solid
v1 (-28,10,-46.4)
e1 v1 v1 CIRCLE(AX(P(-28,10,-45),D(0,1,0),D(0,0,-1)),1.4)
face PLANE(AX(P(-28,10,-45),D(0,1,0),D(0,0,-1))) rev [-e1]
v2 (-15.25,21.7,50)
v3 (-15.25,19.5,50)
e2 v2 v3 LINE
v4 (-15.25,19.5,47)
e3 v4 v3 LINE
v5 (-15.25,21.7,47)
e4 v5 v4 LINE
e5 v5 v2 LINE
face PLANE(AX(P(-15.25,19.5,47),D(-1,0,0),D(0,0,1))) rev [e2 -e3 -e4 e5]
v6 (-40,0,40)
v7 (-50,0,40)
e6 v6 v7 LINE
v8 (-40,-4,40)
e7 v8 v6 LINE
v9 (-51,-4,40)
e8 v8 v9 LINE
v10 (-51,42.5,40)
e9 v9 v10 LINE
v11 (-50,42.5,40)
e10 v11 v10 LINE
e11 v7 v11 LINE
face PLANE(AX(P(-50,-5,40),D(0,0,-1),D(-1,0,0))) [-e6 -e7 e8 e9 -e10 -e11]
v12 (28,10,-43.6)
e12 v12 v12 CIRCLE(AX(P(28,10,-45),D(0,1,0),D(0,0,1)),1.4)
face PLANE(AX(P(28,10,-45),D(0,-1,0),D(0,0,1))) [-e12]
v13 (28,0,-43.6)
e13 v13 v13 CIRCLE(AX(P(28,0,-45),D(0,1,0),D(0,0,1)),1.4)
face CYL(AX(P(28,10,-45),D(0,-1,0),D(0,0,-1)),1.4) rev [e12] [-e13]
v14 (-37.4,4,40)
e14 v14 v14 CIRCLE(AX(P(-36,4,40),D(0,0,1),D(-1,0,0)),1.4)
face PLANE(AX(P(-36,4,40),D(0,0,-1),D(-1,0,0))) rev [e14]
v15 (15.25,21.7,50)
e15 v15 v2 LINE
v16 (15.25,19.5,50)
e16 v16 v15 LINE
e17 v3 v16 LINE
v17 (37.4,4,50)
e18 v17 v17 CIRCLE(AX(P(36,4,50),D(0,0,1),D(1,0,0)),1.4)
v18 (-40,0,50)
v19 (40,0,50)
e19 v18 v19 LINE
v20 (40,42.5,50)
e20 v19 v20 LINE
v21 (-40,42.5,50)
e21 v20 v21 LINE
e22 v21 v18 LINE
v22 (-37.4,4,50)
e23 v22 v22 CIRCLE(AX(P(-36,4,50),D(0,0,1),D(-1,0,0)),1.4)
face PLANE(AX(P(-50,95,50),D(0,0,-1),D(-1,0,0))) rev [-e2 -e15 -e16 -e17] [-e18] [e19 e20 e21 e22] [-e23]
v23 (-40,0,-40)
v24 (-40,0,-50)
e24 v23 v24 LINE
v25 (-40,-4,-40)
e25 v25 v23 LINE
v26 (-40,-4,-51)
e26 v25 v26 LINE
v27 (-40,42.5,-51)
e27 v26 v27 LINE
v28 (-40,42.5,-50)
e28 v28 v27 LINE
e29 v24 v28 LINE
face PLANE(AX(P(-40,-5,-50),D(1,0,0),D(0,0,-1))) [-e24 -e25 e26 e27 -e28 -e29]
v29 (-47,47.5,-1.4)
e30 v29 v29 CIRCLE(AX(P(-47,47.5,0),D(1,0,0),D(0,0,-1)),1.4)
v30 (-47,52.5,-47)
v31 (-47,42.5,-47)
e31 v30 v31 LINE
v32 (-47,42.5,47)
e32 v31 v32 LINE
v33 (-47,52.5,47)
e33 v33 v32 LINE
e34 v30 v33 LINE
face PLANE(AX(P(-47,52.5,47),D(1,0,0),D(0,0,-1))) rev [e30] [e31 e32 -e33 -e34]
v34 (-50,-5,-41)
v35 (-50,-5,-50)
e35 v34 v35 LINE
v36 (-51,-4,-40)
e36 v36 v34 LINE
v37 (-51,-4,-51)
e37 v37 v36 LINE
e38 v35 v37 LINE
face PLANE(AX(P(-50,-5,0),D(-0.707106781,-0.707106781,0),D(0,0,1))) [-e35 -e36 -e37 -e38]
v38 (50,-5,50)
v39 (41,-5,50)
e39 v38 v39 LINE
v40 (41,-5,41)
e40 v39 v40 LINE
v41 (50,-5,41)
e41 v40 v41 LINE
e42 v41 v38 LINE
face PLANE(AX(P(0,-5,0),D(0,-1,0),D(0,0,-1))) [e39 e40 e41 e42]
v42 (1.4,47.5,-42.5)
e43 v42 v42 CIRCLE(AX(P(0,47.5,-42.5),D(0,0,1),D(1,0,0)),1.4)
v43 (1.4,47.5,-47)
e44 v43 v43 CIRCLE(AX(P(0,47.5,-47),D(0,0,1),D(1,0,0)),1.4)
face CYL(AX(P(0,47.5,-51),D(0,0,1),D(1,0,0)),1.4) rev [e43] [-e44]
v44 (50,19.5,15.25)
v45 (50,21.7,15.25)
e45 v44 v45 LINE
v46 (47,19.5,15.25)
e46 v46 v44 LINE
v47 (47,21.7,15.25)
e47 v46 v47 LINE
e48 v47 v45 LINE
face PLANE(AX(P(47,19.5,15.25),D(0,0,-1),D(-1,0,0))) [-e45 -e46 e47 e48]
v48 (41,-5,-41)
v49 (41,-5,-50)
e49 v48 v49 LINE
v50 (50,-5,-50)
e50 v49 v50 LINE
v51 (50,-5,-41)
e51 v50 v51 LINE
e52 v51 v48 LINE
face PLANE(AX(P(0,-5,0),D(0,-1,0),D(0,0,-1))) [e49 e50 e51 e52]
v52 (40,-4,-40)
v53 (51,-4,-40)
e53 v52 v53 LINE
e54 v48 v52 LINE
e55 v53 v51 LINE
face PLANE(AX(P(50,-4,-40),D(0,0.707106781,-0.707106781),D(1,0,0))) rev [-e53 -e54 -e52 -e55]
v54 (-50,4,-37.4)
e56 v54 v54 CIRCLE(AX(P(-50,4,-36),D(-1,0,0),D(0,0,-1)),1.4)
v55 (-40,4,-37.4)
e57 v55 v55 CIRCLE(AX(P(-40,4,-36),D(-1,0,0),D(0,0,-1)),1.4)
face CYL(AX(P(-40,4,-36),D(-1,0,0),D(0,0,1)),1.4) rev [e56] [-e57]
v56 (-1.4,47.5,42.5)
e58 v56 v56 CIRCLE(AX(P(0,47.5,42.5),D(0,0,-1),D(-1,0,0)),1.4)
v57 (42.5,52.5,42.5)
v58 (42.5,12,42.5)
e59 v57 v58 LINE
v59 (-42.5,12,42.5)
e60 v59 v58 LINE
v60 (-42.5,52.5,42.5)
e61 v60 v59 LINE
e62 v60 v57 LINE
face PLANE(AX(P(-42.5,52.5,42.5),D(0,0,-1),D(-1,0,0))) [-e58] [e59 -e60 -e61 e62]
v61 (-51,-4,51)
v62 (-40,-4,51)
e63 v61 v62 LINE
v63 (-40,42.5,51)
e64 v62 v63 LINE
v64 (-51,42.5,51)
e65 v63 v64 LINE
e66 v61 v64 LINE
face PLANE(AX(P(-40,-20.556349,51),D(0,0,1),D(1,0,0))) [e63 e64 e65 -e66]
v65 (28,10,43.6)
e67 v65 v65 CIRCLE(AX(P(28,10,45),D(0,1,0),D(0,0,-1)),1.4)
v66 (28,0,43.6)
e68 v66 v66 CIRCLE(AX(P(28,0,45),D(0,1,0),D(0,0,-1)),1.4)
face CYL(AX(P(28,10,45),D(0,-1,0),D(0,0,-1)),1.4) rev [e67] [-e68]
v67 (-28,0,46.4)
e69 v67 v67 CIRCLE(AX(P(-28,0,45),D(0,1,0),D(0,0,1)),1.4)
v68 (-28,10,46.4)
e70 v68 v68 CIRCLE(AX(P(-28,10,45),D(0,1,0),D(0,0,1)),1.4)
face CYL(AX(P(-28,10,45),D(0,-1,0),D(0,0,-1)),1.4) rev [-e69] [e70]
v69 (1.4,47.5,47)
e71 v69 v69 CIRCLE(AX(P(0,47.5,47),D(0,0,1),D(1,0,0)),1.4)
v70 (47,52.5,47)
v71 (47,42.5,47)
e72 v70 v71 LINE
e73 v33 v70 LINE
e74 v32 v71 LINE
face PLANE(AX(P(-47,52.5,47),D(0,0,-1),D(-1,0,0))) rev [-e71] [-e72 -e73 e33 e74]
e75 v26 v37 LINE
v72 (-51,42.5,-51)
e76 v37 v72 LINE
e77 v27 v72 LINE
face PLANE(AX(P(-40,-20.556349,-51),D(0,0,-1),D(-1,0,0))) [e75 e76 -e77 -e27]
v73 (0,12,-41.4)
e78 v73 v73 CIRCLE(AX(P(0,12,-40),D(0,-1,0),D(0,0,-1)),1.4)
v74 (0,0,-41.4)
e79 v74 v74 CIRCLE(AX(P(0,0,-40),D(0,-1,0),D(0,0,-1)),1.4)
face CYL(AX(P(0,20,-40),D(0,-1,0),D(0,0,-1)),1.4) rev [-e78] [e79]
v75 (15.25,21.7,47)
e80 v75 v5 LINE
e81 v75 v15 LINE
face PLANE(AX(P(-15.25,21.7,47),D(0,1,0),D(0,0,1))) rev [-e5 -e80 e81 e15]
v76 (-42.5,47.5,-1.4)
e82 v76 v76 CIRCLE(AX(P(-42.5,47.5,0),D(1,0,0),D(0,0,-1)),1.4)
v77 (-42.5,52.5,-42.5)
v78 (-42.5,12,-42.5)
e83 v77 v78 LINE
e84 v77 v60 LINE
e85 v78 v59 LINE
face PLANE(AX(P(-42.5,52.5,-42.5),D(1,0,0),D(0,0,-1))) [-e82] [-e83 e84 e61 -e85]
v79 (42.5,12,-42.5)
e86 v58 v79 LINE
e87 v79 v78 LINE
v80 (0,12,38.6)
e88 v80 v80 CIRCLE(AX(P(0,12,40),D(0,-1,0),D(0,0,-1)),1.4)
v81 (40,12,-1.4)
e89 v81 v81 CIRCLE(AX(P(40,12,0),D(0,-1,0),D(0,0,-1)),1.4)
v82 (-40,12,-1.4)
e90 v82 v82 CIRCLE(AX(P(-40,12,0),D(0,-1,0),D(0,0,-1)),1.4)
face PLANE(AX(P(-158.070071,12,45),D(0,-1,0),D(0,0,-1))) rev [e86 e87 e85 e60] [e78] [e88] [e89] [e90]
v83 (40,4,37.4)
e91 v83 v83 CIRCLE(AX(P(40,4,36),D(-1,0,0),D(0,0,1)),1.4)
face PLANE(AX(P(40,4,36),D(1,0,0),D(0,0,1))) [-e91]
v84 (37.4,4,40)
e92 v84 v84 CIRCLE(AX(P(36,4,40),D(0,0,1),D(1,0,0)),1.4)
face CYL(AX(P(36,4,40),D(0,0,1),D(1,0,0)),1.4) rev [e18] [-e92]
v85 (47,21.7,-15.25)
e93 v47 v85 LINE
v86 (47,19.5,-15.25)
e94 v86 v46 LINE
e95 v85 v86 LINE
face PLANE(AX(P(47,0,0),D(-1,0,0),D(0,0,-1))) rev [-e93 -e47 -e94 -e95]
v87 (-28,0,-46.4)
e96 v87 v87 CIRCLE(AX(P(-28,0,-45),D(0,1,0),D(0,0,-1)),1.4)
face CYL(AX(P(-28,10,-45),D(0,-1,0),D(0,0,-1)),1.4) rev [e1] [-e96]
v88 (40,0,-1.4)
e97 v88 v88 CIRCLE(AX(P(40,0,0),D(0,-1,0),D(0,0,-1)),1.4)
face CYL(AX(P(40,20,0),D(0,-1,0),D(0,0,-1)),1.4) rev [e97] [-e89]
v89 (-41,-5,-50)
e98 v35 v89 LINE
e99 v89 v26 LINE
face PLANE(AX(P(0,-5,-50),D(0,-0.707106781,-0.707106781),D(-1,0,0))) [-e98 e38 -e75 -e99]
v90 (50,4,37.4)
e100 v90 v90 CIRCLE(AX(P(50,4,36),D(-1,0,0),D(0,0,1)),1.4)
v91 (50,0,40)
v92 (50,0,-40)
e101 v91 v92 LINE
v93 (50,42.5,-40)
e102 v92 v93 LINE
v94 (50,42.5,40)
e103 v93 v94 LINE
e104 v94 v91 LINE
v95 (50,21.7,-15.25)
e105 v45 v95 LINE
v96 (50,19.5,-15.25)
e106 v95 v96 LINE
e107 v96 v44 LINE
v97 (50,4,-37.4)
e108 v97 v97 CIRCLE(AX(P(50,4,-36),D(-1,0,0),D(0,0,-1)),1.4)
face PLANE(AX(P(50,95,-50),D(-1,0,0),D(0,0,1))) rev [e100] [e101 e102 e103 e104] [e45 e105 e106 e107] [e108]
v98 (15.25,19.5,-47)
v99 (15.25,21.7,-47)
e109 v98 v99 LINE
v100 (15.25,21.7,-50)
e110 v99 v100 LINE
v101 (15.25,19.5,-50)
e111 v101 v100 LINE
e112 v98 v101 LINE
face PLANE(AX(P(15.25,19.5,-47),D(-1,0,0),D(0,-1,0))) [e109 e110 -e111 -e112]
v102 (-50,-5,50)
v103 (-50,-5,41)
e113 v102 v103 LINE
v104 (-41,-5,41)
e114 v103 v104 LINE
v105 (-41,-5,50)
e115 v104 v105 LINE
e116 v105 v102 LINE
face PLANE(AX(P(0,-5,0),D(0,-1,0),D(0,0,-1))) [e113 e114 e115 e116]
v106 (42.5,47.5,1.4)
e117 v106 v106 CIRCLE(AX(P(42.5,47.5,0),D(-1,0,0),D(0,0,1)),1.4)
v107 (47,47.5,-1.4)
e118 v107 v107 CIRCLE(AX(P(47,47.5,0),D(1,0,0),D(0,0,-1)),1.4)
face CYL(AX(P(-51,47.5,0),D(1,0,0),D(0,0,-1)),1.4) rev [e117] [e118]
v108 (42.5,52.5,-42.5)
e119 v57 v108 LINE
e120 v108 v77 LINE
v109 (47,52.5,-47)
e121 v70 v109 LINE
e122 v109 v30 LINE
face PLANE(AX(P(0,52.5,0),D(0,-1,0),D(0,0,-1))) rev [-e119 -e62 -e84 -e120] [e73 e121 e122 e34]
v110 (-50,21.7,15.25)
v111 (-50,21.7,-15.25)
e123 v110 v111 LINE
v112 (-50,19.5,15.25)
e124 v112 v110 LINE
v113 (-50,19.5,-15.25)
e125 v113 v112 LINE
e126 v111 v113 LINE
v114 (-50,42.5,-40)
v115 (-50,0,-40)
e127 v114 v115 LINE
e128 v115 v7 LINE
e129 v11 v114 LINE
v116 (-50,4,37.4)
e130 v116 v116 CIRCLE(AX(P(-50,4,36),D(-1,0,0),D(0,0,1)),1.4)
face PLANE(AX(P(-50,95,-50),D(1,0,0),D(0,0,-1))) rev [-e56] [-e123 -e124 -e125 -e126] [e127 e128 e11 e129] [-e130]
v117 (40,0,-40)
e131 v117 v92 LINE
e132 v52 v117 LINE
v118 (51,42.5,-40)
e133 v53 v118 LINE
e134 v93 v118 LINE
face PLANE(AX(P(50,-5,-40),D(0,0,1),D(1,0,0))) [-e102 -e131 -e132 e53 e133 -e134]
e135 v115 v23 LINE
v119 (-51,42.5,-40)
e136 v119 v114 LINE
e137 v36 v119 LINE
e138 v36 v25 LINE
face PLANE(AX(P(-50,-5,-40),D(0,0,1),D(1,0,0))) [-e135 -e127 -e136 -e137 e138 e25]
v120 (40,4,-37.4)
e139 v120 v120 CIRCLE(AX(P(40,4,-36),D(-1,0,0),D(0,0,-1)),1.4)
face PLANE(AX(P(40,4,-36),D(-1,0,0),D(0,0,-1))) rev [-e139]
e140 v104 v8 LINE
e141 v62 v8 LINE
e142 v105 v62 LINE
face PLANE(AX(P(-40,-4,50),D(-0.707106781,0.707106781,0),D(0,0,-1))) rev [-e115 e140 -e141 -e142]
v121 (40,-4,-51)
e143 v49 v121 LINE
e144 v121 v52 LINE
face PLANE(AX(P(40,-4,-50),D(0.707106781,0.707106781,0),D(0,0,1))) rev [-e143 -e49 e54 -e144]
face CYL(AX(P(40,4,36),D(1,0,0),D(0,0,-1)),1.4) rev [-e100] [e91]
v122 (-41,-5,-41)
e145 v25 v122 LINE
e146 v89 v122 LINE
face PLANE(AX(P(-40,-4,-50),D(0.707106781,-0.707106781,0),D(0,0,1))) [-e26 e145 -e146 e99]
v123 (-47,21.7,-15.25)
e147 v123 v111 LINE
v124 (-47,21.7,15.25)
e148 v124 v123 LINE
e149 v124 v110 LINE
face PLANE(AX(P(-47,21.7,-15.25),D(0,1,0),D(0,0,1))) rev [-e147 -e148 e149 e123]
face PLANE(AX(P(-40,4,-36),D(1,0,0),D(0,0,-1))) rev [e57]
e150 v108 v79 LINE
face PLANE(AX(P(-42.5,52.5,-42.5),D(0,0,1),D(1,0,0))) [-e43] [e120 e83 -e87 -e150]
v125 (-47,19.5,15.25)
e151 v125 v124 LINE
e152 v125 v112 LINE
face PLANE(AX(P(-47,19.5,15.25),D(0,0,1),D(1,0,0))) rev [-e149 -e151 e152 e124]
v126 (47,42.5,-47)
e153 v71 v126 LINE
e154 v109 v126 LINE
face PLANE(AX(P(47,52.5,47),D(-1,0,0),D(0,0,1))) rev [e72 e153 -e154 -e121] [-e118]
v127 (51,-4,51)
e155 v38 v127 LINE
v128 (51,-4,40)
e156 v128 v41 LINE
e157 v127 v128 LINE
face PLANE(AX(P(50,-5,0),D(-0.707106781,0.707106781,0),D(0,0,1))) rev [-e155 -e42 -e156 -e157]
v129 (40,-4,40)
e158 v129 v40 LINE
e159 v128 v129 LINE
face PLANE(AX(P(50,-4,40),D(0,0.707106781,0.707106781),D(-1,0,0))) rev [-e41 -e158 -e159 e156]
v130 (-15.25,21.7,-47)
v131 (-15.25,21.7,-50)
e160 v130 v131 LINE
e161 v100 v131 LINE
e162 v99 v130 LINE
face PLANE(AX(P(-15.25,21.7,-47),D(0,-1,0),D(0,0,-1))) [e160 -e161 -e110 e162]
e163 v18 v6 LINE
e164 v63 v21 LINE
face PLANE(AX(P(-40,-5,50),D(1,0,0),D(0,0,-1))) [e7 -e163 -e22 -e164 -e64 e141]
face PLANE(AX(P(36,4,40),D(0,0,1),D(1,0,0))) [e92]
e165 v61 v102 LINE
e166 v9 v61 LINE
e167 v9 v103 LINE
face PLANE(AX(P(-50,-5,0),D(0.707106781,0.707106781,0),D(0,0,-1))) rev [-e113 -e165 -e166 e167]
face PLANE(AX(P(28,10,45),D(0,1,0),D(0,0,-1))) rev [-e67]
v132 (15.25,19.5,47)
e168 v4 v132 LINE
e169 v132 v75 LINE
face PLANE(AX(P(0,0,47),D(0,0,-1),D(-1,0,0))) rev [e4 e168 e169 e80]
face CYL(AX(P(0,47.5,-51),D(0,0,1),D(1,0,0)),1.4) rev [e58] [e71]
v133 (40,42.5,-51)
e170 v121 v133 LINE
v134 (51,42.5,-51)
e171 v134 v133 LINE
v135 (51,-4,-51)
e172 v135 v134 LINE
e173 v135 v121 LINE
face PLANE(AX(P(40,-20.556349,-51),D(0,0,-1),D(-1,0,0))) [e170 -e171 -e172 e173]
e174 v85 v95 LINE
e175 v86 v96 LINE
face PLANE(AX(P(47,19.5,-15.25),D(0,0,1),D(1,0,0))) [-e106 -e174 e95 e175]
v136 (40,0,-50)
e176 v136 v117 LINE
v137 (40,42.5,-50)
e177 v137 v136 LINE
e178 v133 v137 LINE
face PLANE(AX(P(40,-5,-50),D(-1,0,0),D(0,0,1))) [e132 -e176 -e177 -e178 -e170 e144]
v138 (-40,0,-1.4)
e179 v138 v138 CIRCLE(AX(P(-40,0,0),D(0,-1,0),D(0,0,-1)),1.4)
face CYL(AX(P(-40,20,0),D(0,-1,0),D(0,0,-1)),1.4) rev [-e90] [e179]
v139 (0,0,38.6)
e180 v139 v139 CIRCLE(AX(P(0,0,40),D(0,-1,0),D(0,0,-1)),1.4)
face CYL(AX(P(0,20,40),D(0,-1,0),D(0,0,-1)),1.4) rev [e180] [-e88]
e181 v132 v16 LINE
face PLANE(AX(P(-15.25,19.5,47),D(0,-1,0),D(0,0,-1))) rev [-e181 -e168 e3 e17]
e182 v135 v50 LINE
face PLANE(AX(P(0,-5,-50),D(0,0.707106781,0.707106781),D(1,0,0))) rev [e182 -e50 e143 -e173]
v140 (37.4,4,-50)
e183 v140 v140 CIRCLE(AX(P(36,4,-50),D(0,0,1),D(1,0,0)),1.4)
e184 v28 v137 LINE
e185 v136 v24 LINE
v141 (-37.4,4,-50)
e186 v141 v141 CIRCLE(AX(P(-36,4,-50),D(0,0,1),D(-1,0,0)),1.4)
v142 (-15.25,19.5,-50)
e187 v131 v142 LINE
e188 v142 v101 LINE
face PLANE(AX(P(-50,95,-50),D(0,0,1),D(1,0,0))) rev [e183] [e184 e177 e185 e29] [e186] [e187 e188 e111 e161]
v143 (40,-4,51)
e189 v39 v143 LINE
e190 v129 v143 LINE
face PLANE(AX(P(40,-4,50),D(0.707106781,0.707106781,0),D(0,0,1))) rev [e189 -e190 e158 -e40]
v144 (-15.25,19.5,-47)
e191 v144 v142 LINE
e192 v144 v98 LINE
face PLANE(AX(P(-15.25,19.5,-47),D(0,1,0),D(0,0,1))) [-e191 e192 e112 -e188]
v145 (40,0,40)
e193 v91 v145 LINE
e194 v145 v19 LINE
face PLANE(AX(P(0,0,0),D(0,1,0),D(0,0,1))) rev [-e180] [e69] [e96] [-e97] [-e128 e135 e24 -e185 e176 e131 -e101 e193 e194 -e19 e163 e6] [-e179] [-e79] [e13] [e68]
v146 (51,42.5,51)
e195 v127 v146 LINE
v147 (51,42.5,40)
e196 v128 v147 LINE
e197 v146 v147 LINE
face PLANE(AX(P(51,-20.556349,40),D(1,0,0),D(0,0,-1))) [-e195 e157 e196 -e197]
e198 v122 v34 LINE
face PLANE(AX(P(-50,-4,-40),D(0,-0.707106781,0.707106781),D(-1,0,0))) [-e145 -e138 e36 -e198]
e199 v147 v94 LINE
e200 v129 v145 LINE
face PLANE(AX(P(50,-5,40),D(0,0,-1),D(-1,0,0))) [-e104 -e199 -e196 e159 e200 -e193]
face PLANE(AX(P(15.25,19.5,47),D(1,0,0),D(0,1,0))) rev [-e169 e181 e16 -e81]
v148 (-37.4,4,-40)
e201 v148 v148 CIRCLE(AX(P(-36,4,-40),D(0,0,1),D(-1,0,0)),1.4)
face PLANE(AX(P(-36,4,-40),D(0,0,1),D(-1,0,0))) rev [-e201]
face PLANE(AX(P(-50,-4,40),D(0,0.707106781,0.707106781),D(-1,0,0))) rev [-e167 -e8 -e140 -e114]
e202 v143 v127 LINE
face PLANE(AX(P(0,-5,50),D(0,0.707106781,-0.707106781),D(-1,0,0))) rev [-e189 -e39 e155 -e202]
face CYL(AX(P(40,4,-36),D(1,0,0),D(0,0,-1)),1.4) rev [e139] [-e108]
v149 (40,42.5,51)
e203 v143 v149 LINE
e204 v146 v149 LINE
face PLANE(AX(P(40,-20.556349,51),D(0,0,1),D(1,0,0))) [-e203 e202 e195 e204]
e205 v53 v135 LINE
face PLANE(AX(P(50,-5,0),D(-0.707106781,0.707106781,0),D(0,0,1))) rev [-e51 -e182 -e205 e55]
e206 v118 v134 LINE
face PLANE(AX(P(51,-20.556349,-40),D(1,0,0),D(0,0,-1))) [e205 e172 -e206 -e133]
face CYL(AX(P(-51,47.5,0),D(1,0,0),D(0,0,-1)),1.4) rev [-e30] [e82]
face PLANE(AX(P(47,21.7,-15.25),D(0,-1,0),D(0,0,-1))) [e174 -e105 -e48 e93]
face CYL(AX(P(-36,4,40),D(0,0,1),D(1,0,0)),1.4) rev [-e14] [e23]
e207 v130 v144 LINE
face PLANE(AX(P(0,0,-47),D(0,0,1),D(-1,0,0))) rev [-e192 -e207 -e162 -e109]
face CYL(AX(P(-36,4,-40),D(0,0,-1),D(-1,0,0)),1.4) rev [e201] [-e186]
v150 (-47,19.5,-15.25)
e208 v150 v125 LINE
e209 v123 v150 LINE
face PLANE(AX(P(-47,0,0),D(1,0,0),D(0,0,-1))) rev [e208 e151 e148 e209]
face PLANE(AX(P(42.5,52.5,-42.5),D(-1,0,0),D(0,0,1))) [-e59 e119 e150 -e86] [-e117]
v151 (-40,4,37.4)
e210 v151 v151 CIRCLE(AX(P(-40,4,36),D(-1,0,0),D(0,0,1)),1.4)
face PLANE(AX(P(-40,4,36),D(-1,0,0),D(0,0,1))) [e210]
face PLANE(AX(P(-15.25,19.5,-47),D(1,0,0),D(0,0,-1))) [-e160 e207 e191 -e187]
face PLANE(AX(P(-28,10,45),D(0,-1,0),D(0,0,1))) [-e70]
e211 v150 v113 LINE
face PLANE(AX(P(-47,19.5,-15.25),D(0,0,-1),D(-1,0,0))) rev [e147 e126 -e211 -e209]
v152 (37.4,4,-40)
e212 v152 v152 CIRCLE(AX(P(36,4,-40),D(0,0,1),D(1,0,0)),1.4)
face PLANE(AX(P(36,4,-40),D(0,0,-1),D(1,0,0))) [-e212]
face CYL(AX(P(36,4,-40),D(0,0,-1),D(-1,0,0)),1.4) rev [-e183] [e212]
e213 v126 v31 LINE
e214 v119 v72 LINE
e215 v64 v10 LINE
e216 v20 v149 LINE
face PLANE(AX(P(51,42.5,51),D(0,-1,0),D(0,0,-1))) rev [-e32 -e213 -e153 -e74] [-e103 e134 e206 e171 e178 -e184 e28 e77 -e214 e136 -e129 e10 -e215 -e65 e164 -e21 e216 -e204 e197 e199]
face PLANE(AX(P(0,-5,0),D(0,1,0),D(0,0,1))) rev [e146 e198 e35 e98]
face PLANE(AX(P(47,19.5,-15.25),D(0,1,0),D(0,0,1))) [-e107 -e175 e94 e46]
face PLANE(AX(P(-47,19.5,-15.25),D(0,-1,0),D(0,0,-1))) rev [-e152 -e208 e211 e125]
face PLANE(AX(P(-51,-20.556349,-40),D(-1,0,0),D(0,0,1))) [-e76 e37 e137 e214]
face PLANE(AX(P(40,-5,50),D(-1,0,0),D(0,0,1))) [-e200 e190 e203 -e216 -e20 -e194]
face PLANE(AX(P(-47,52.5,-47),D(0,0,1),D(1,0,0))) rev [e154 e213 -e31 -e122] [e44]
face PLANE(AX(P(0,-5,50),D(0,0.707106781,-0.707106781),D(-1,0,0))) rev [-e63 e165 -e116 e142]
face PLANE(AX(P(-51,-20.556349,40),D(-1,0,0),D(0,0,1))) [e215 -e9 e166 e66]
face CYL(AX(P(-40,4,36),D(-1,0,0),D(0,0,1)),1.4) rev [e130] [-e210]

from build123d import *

# Parameters (mm, degrees)
SKETCH1_W                       = 100
SKETCH1_H                       = 100
BOSS_EXTRUDE1_DEPTH             = 95
SKETCH2_W                       = 10
SKETCH2_H                       = 10
BOSS_EXTRUDE2_DEPTH             = 105
SKETCH3_R                       = 1.4
CUT_EXTRUDE1_DEPTH              = 10
SKETCH4_W                       = 11
SKETCH4_H                       = 11
BOSS_EXTRUDE3_DEPTH             = 105
SKETCH5_R                       = 1.4
CUT_EXTRUDE2_DEPTH              = 10
SKETCH6_R                       = 1.4
CUT_EXTRUDE3_DEPTH              = 10
CHAMFER1_SIZE                   = 1
SKETCH7_W                       = 19
SKETCH7_H                       = 43
SKETCH7_W_2                     = 16
SKETCH7_H_2                     = 40
BOSS_EXTRUDE4_DEPTH             = 3
SKETCH8_W                       = 16
SKETCH8_H                       = 40
CUT_EXTRUDE4_DEPTH              = 10
CHAMFER2_SIZE                   = 13
SKETCH9_W                       = 16
SKETCH9_H                       = 3.1
CUT_EXTRUDE5_DEPTH              = 10
FILLET1_R                       = 1
SKETCH10_R                      = 1.4
CUT_EXTRUDE6_DEPTH              = 10
SKETCH12_W                      = 30.5
SKETCH12_H                      = 2.2
CUT_EXTRUDE7_DEPTH              = 3
SKETCH13_W                      = 30.5
SKETCH13_H                      = 2.2
CUT_EXTRUDE8_DEPTH              = 3
SKETCH14_W                      = 2.2
SKETCH14_H                      = 30.5
CUT_EXTRUDE9_DEPTH              = 3
CUT_EXTRUDE10_DEPTH             = 45
CUT_EXTRUDE10_DEPTH_BACK        = 45
SKETCH15_W                      = 90
SKETCH15_H                      = 58
CUT_EXTRUDE11_REACH             = 125.296
CUT_EXTRUDE11_DIRECTION_2_REACH = 125.296
CHAMFER3_SIZE                   = 4
CUT_EXTRUDE12_DEPTH             = 152.673992497
BOSS_EXTRUDE7_DEPTH             = 10
BOSS_EXTRUDE7_DEPTH_BACK        = 30.5
SKETCH19_W                      = 94
SKETCH19_H                      = 94
SKETCH19_W_2                    = 85
SKETCH19_H_2                    = 85
SKETCH20_R                      = 1.4
CUT_EXTRUDE13_DEPTH             = 123.316188626
SKETCH21_R                      = 1.4
CUT_EXTRUDE14_DEPTH             = 123.316188626
SKETCH22_W                      = 2.2
SKETCH22_H                      = 30.5
BOSS_EXTRUDE8_DEPTH             = 3
SKETCH23_R                      = 1.4
CUT_EXTRUDE15_DEPTH             = 20


with BuildPart() as part:
    # Sketch1 → Boss-Extrude1 (new body)
    with BuildSketch(Plane(origin=(0, 0, 0), x_dir=(1, 0, 0), z_dir=(0, 1, 0))):
        Rectangle(SKETCH1_W, SKETCH1_H)
    extrude(amount=BOSS_EXTRUDE1_DEPTH)

    # Sketch2 → Boss-Extrude2 (add)
    with BuildSketch(Plane(origin=(0, 100, 0), x_dir=(1, 0, 0), z_dir=(0, 1, 0))):
        with Locations((-45, 45)):
            Rectangle(SKETCH2_W, SKETCH2_H)
        with Locations((45, 45)):
            Rectangle(SKETCH2_W, SKETCH2_H)
        with Locations((45, -45)):
            Rectangle(SKETCH2_W, SKETCH2_H)
        with Locations((-45, -45)):
            Rectangle(SKETCH2_W, SKETCH2_H)
    extrude(amount=-BOSS_EXTRUDE2_DEPTH)

    # Sketch3 → Cut-Extrude1 (cut)
    with BuildSketch(Plane(origin=(0, 95, 0), x_dir=(1, 0, 0), z_dir=(0, 1, 0))):
        with Locations(Location((-28, -45, 0), (0, 0, 270))):
            Circle(SKETCH3_R)
        with Locations(Location((28, -45, 0), (0, 0, 90))):
            Circle(SKETCH3_R)
        with Locations(Location((28, 45, 0), (0, 0, 270))):
            Circle(SKETCH3_R)
        with Locations(Location((-28, 45, 0), (0, 0, 90))):
            Circle(SKETCH3_R)
    cut_extrude1 = extrude(amount=-CUT_EXTRUDE1_DEPTH, mode=Mode.SUBTRACT)

    # Sketch4 → Boss-Extrude3 (add)
    with BuildSketch(Plane(origin=(0, 100, 0), x_dir=(1, 0, 0), z_dir=(0, 1, 0))):
        with Locations((-45.5, 45.5)):
            Rectangle(SKETCH4_W, SKETCH4_H)
        with Locations((45.5, 45.5)):
            Rectangle(SKETCH4_W, SKETCH4_H)
        with Locations((45.5, -45.5)):
            Rectangle(SKETCH4_W, SKETCH4_H)
        with Locations((-45.5, -45.5)):
            Rectangle(SKETCH4_W, SKETCH4_H)
    extrude(amount=-BOSS_EXTRUDE3_DEPTH)

    # Sketch5 → Cut-Extrude2 (cut)
    with BuildSketch(Plane.XY.offset(50)):
        with Locations((-36, 91)):
            Circle(SKETCH5_R)
        with Locations(Location((36, 91, 0), (0, 0, 180))):
            Circle(SKETCH5_R)
        with Locations((36, 4)):
            Circle(SKETCH5_R)
        with Locations(Location((-36, 4, 0), (0, 0, 180))):
            Circle(SKETCH5_R)
    cut_extrude2 = extrude(amount=-CUT_EXTRUDE2_DEPTH, mode=Mode.SUBTRACT)

    # Mirror1: Cut-Extrude2 across plane
    add(cut_extrude2.mirror(Plane.XY), mode=Mode.SUBTRACT)

    # Sketch6 → Cut-Extrude3 (cut)
    with BuildSketch(Plane.ZY.offset(50)):
        with Locations((-36, 91)):
            Circle(SKETCH6_R)
        with Locations(Location((36, 91, 0), (0, 0, 180))):
            Circle(SKETCH6_R)
        with Locations((36, 4)):
            Circle(SKETCH6_R)
        with Locations(Location((-36, 4, 0), (0, 0, 180))):
            Circle(SKETCH6_R)
    cut_extrude3 = extrude(amount=-CUT_EXTRUDE3_DEPTH, mode=Mode.SUBTRACT)

    # Mirror2: Cut-Extrude3 across plane
    add(cut_extrude3.mirror(Plane(origin=(0, 0, 0), x_dir=(0, 0, 1), z_dir=(1, 0, 0))), mode=Mode.SUBTRACT)

    # Mirror3: Cut-Extrude1 across plane
    add(cut_extrude1.mirror(Plane.ZX.offset(47.5)), mode=Mode.SUBTRACT)

    # Chamfer1
    chamfer1_edges = [part.edges().sort_by_distance(p)[0] for p in [
        (-45.5, -5, 51),
        (-51, -5, 45.5),
        (-51, 100, 45.5),
        (-45.5, 100, 51),
        (51, -5, 45.5),
        (45.5, -5, 51),
        (45.5, 100, 51),
        (51, 100, 45.5),
        (45.5, -5, -51),
        (51, -5, -45.5),
        (51, 100, -45.5),
        (45.5, 100, -51),
        (-51, -5, -45.5),
        (-45.5, -5, -51),
        (-45.5, 100, -51),
        (-51, 100, -45.5),
        (-45.5, -5, 40),
        (-40, -5, 45.5),
        (-40, 100, 45.5),
        (-45.5, 100, 40),
        (40, -5, 45.5),
        (45.5, -5, 40),
        (45.5, 100, 40),
        (40, 100, 45.5),
        (45.5, -5, -40),
        (40, -5, -45.5),
        (45, 95, -40),
        (40, 100, -45.5),
        (45.5, 100, -40),
        (-40, -5, -45.5),
        (-45.5, -5, -40),
        (-45.5, 100, -40),
        (-40, 100, -45.5),
    ]]
    chamfer(chamfer1_edges, length=CHAMFER1_SIZE)

    # Sketch7 → Boss-Extrude4 (add)
    with BuildSketch(Plane(origin=(0, 95, 0), x_dir=(1, 0, 0), z_dir=(0, 1, 0))):
        with Locations((0, -17)):
            Rectangle(SKETCH7_W, SKETCH7_H)
        with Locations((0, -17)):
            Rectangle(SKETCH7_W_2, SKETCH7_H_2, mode=Mode.SUBTRACT)
    extrude(amount=BOSS_EXTRUDE4_DEPTH)

    # Sketch8 → Cut-Extrude4 (cut)
    with BuildSketch(Plane(origin=(0, 95, 0), x_dir=(1, 0, 0), z_dir=(0, 1, 0))):
        with Locations((0, -17)):
            Rectangle(SKETCH8_W, SKETCH8_H)
    extrude(amount=-CUT_EXTRUDE4_DEPTH, mode=Mode.SUBTRACT)

    # Chamfer2
    chamfer2_edges = [part.edges().sort_by_distance(p)[0] for p in [
        (0, 85, 37),
    ]]
    chamfer(chamfer2_edges, length=CHAMFER2_SIZE - 0.0001)  # a hair under: the kernel refuses the full size

    # Sketch9 → Cut-Extrude5 (cut)
    with BuildSketch(Plane(origin=(0, 85, 0), x_dir=(1, 0, 0), z_dir=(0, 1, 0))):
        with Locations((0, 1.45)):
            Rectangle(SKETCH9_W, SKETCH9_H)
    extrude(amount=-CUT_EXTRUDE5_DEPTH, mode=Mode.SUBTRACT)

    # Fillet1
    fillet1_edges = [part.edges().sort_by_distance(p)[0] for p in [
        (0, 85, 0.1),
    ]]
    fillet(fillet1_edges, radius=FILLET1_R)

    # Sketch10 → Cut-Extrude6 (cut)
    with BuildSketch(Plane.XY.offset(-3)):
        with Locations((0, 92)):
            Circle(SKETCH10_R)
    extrude(amount=-CUT_EXTRUDE6_DEPTH, mode=Mode.SUBTRACT)

    # Sketch12 → Cut-Extrude7 (cut)
    with BuildSketch(Plane.ZY.offset(50)):
        with Locations((0, 74.4)):
            Rectangle(SKETCH12_W, SKETCH12_H)
        with Locations((0, 20.6)):
            Rectangle(SKETCH12_W, SKETCH12_H)
    cut_extrude7 = extrude(amount=-CUT_EXTRUDE7_DEPTH, mode=Mode.SUBTRACT)

    # Mirror4: Cut-Extrude7 across plane
    add(cut_extrude7.mirror(Plane(origin=(0, 0, 0), x_dir=(0, 0, 1), z_dir=(1, 0, 0))), mode=Mode.SUBTRACT)

    # Sketch13 → Cut-Extrude8 (cut)
    with BuildSketch(Plane.XY.offset(50)):
        with Locations((0, 74.4)):
            Rectangle(SKETCH13_W, SKETCH13_H)
        with Locations((0, 20.6)):
            Rectangle(SKETCH13_W, SKETCH13_H)
    cut_extrude8 = extrude(amount=-CUT_EXTRUDE8_DEPTH, mode=Mode.SUBTRACT)

    # Mirror5: Cut-Extrude8 across plane
    add(cut_extrude8.mirror(Plane.XY), mode=Mode.SUBTRACT)

    # Sketch14 → Cut-Extrude9 (cut)
    with BuildSketch(Plane(origin=(0, 95, 0), x_dir=(1, 0, 0), z_dir=(0, 1, 0))):
        with Locations((26.9, 0)):
            Rectangle(SKETCH14_W, SKETCH14_H)
        with Locations((-26.9, 0)):
            Rectangle(SKETCH14_W, SKETCH14_H)
    cut_extrude9 = extrude(amount=-CUT_EXTRUDE9_DEPTH, mode=Mode.SUBTRACT)

    # Mirror6: Cut-Extrude9 across plane
    add(cut_extrude9.mirror(Plane.ZX.offset(47.5)), mode=Mode.SUBTRACT)

    # Sketch15 → Cut-Extrude10 (cut, two sides: drawn at the far end of the back side and taken through both)
    with BuildSketch(Plane(origin=(0, 0, 0), x_dir=(0, 0, -1), z_dir=(1, 0, 0)).offset(-CUT_EXTRUDE10_DEPTH_BACK)):
        with Locations((0, 41)):
            Rectangle(SKETCH15_W, SKETCH15_H)
    extrude(amount=CUT_EXTRUDE10_DEPTH + CUT_EXTRUDE10_DEPTH_BACK, mode=Mode.SUBTRACT)

    # Cut-Extrude11: up to this face of the body (flat: up to its plane)
    cut_extrude11_end = Plane(part.part.faces().sort_by_distance((0, 41, 45))[0])
    # Sketch16 → Cut-Extrude11 (cut, up to the picked face)
    with BuildSketch(Plane.XY, mode=Mode.PRIVATE) as cut_extrude11_sk1:
        Polygon((45, 57.006357685), (-45, 57.006357685), (-45, 83), (-13, 83), (-13, 67.006357685), (13, 67.006357685), (13, 83), (45, 83), align=None)
    cut_extrude11_tool1 = split(extrude(cut_extrude11_sk1.sketch, amount=CUT_EXTRUDE11_REACH, mode=Mode.PRIVATE), bisect_by=cut_extrude11_end, keep=Keep.BOTH, mode=Mode.PRIVATE)
    add(cut_extrude11_tool1.solids().sort_by(Axis((0, 57.943143, 0), (0, 0, 1)))[0], mode=Mode.SUBTRACT)

    # Cut-Extrude11 direction 2: up to this face of the body (flat: up to its plane)
    cut_extrude11_direction_2_end = Plane(part.part.faces().sort_by_distance((0, 41, -45))[0])
    # Sketch16 → Cut-Extrude11 direction 2 (cut, up to the picked face)
    with BuildSketch(Plane.XY, mode=Mode.PRIVATE) as cut_extrude11_direction_2_sk1:
        Polygon((45, 57.006357685), (-45, 57.006357685), (-45, 83), (-13, 83), (-13, 67.006357685), (13, 67.006357685), (13, 83), (45, 83), align=None)
    cut_extrude11_direction_2_tool1 = split(extrude(cut_extrude11_direction_2_sk1.sketch, amount=-CUT_EXTRUDE11_DIRECTION_2_REACH, mode=Mode.PRIVATE), bisect_by=cut_extrude11_direction_2_end, keep=Keep.BOTH, mode=Mode.PRIVATE)
    add(cut_extrude11_direction_2_tool1.solids().sort_by(Axis((0, 57.943143, 0), (0, 0, -1)))[0], mode=Mode.SUBTRACT)

    # Chamfer3
    chamfer3_edges = [part.edges().sort_by_distance(p)[0] for p in [
        (13, 70, 0),
        (-13, 70, 0),
    ]]
    chamfer(chamfer3_edges, length=CHAMFER3_SIZE)

    # Sketch17 → Cut-Extrude12 (cut, through all)
    with BuildSketch(Plane(origin=(0, 0, -51), x_dir=(-1, 0, 0), z_dir=(0, 0, -1))):
        Polygon((-51, 47.5), (-51, 104.912758391), (51, 104.912758391), (51, 47.5), (51, 42.5), (-51, 42.5), align=None)
    extrude(amount=-CUT_EXTRUDE12_DEPTH, mode=Mode.SUBTRACT)

    # Sketch19 → Boss-Extrude7 (add, two sides: drawn at the far end of the back side and taken through both)
    with BuildSketch(Plane(origin=(0, 42.5, 0), x_dir=(1, 0, 0), z_dir=(0, 1, 0)).offset(-BOSS_EXTRUDE7_DEPTH_BACK)):
        Rectangle(SKETCH19_W, SKETCH19_H)
        Rectangle(SKETCH19_W_2, SKETCH19_H_2, mode=Mode.SUBTRACT)
    extrude(amount=BOSS_EXTRUDE7_DEPTH + BOSS_EXTRUDE7_DEPTH_BACK)

    # Sketch20 → Cut-Extrude13 (cut, through all)
    with BuildSketch(Plane.XY.offset(47)):
        with Locations((0, 47.5)):
            Circle(SKETCH20_R)
    extrude(amount=-CUT_EXTRUDE13_DEPTH, mode=Mode.SUBTRACT)

    # Sketch21 → Cut-Extrude14 (cut, through all)
    with BuildSketch(Plane(origin=(47, 0, 0), x_dir=(0, 0, -1), z_dir=(1, 0, 0))):
        with Locations((0, 47.5)):
            Circle(SKETCH21_R)
    extrude(amount=-CUT_EXTRUDE14_DEPTH, mode=Mode.SUBTRACT)

    # Sketch22 → Boss-Extrude8 (add)
    with BuildSketch(Plane.XZ):
        with Locations((26.9, 0)):
            Rectangle(SKETCH22_W, SKETCH22_H)
        with Locations((-26.9, 0)):
            Rectangle(SKETCH22_W, SKETCH22_H)
    extrude(amount=-BOSS_EXTRUDE8_DEPTH)

    # Sketch23 → Cut-Extrude15 (cut)
    with BuildSketch(Plane.XZ):
        with Locations(Location((-40, 0, 0), (0, 0, 270))):
            Circle(SKETCH23_R)
        with Locations(Location((0, 40, 0), (0, 0, 270))):
            Circle(SKETCH23_R)
        with Locations(Location((40, 0, 0), (0, 0, 270))):
            Circle(SKETCH23_R)
        with Locations(Location((0, -40, 0), (0, 0, 270))):
            Circle(SKETCH23_R)
    extrude(amount=-CUT_EXTRUDE15_DEPTH, mode=Mode.SUBTRACT)


solid = part.part
